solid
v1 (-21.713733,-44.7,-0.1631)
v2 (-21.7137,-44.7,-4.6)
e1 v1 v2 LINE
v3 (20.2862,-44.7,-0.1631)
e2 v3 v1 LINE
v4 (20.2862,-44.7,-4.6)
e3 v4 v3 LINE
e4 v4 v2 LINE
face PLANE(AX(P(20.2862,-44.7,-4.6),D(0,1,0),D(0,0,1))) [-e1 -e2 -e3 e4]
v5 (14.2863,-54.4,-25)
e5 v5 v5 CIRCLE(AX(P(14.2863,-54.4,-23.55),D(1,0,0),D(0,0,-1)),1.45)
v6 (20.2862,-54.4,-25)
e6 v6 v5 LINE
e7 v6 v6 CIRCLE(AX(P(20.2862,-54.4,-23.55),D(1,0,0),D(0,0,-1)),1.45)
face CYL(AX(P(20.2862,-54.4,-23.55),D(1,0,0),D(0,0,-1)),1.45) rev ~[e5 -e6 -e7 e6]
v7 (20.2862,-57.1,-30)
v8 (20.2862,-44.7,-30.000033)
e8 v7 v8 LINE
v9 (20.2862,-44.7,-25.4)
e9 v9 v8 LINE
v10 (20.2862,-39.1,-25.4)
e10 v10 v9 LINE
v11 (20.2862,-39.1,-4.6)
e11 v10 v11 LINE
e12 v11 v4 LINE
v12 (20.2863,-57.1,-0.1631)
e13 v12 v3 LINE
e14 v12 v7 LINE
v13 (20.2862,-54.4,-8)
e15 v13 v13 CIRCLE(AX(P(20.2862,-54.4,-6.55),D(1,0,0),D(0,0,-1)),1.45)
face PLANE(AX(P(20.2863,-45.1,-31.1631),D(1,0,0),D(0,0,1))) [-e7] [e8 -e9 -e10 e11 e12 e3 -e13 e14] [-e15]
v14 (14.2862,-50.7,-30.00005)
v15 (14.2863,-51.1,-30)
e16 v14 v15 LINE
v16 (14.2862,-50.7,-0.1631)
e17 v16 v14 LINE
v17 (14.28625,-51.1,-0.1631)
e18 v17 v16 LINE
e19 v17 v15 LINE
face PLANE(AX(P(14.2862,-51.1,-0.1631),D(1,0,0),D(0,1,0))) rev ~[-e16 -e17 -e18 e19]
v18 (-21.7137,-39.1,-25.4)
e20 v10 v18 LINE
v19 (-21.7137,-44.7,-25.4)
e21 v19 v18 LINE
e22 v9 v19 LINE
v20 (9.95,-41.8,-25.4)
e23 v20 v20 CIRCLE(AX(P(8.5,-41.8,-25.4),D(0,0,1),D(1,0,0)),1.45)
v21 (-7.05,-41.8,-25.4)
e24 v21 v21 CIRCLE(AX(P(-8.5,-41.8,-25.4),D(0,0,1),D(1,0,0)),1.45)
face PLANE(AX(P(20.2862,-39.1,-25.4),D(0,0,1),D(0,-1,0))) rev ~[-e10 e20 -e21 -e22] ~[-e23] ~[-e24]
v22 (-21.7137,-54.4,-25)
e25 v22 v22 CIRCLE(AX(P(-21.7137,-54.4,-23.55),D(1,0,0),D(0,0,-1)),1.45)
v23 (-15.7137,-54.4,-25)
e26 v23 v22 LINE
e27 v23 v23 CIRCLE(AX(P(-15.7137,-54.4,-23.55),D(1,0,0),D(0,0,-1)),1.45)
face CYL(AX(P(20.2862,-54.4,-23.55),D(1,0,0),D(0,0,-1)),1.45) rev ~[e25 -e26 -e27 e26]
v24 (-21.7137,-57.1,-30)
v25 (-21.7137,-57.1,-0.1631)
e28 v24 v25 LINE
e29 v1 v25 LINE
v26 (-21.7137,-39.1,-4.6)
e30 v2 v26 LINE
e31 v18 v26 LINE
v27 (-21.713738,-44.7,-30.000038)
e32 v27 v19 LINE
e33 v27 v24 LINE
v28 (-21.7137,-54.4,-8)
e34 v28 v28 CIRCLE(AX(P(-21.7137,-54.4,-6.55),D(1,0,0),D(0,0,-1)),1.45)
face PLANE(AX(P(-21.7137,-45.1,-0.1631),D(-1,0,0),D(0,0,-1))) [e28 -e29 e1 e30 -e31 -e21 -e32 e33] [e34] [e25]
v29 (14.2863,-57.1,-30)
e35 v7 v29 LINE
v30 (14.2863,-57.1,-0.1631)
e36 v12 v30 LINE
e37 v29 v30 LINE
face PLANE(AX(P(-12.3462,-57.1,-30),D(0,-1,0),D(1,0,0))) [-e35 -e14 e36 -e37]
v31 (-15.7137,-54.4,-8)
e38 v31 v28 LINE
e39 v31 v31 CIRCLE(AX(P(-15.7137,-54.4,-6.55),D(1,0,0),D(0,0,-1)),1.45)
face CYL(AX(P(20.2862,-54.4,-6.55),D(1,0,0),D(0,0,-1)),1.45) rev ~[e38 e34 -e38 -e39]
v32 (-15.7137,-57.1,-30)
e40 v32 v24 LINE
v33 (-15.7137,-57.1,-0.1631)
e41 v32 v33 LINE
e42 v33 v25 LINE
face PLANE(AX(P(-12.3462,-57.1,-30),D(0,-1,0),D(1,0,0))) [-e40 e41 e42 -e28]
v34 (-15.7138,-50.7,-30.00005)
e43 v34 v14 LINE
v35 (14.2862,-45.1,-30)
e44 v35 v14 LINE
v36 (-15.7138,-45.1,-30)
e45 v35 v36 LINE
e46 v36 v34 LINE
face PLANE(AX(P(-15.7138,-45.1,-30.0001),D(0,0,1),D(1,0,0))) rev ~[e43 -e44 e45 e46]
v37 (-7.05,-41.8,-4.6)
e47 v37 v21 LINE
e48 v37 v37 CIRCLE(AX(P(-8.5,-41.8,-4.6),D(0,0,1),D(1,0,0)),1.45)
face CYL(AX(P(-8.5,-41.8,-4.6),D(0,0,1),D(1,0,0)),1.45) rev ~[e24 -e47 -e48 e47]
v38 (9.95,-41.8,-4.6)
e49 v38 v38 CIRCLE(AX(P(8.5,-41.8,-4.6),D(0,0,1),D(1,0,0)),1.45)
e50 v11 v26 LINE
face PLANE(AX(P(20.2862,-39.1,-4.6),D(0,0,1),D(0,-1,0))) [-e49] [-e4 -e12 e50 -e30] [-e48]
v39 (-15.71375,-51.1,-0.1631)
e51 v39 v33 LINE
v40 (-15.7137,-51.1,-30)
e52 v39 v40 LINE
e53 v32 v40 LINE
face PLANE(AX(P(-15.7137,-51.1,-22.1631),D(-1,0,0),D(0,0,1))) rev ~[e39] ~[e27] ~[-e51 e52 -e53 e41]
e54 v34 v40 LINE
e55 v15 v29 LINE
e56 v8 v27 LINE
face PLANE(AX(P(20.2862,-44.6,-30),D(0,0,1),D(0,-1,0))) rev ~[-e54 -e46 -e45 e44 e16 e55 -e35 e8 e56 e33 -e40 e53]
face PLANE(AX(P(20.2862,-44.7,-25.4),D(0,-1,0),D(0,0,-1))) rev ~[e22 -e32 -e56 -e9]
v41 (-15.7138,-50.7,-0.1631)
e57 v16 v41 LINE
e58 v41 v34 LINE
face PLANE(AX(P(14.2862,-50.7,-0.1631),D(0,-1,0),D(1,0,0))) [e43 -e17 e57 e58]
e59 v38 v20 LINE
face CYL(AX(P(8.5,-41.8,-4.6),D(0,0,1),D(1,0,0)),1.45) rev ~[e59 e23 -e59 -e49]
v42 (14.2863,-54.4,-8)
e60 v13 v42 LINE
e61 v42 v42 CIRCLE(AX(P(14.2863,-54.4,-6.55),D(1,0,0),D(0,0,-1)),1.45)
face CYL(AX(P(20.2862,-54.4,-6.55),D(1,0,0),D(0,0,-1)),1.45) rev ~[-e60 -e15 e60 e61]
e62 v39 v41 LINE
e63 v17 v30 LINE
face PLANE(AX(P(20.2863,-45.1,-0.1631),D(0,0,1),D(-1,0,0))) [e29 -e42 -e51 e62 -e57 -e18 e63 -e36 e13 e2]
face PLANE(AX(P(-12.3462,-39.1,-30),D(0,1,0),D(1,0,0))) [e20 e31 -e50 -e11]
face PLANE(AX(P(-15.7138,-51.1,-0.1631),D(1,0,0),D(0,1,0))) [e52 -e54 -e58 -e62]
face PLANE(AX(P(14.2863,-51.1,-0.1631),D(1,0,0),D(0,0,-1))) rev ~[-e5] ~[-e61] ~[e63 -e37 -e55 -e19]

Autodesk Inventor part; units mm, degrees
ref_plane "YZ Plane" through (0, 0, 0) normal (1, 0, 0) x (0, 1, 0)
ref_plane "XZ Plane" through (0, 0, 0) normal (0, 1, 0) x (-1, 0, 0)
ref_plane "XY Plane" through (0, 0, 0) normal (0, 0, 1) x (1, 0, 0)
ref_plane "작업 평면1" through (0, 0, 0) normal (0, 0, 1) x (1, 0, 0)
sketch "스케치1" plane through (0, 0, 0) normal (0, 0, 1) x (1, 0, 0)
  line L0 (-12.7, 12) -> (-9.2, 12) projected
  line L1 (-12.7, 12) -> (-17.8, 6) projected
  line L2 (-17.8, 6) -> (-17.8, -32.6) projected
  line L3 (-17.8, -32.6) -> (-12.7, -38.6) projected
  line L4 (-12.7, -38.6) -> (12.7, -38.6) projected
  line L5 (12.7, -38.6) -> (17.8, -32.6) projected
  line L6 (17.8, -32.6) -> (17.8, 6) projected
  line L7 (17.8, 6) -> (12.7, 12) projected
  line L8 (9.2, 12) -> (12.7, 12) projected
  arc A0 (12.2, 9) -> (9.2, 12) centre (9.2, 9) ccw projected
  line L9 (12.2, -30) -> (12.2, 9) projected
  arc A1 (9.2, -33) -> (12.2, -30) centre (9.2, -30) ccw projected
  line L10 (-9.2, -33) -> (9.2, -33) projected
  arc A2 (-12.2, -30) -> (-9.2, -33) centre (-9.2, -30) ccw projected
  line L11 (-12.2, 9) -> (-12.2, -30) projected
  arc A3 (-9.2, 12) -> (-12.2, 9) centre (-9.2, 9) ccw projected
  circle A4 centre (-15, 4.5) radius 1.35 projected
  circle A5 centre (-15, -12.5) radius 1.35 projected
  circle A6 centre (-8.5, -35.8) radius 1.35 projected
  circle A7 centre (15, 4.5) radius 1.35 projected
  circle A8 centre (15, -12.5) radius 1.35 projected
  circle A9 centre (8.5, -35.8) radius 1.35 projected
  circle A10 centre (-15, -29.5) radius 1.35 projected
  circle A11 centre (15, -29.5) radius 1.35 projected
  arc A12 (9.2, -33.1) -> (12.3, -30) centre (9.2, -30) ccw
  line L12 (12.3, -30) -> (12.3, 9)
  arc A13 (12.3, 9) -> (10.2954, 11.9) centre (9.2, 9) ccw
  line L13 (10.2954, 11.9) -> (12.6538, 11.9)
  line L14 (12.6538, 11.9) -> (17.7, 5.9632)
  line L15 (17.7, 5.9632) -> (17.7, -32.5632)
  line L16 (17.7, -32.5632) -> (12.6538, -38.5)
  line L17 (12.6538, -38.5) -> (-12.6538, -38.5)
  line L18 (-12.6538, -38.5) -> (-17.7, -32.5632)
  line L19 (-17.7, -32.5632) -> (-17.7, 5.9632)
  line L20 (-17.7, 5.9632) -> (-12.6538, 11.9)
  line L21 (-12.6538, 11.9) -> (-10.2954, 11.9)
  arc A14 (-10.2954, 11.9) -> (-12.3, 9) centre (-9.2, 9) ccw
  line L22 (-12.3, 9) -> (-12.3, -30)
  arc A15 (-12.3, -30) -> (-9.2, -33.1) centre (-9.2, -30) ccw
  line L23 (-9.2, -33.1) -> (9.2, -33.1)
  circle A16 centre (-8.5, -35.8) radius 1.45
  circle A17 centre (8.5, -35.8) radius 1.45
  line L24 (12.6538, -33.1) -> (-12.3462, -33.1)
  line L25 (-12.3462, -33.1) -> (-12.3462, -39.1)
  line L26 (-12.3462, -39.1) -> (12.6538, -39.1)
  line L27 (12.6538, -39.1) -> (12.6538, -33.1)
  point P0 (0, 0)
  point P1 (9.2, -33.1)
  point P2 (-9.2, -33.1)
  dimension "d0" = 0.1
  dimension "d1" = 0.1
  dimension "d2" = 0.1
  dimension "d3" = 25
  dimension "d4" = 6
extrude "돌출1" add sketch "스케치1" along normal blind 6 contours L25 L17 L27 L4 | L4 L27 L26 L25 | L25 L24 L23 L27 L17
ref_plane "작업 평면2" through (0, 0, -30) normal (0, 0, -1) x (-1, 0, 0)
sketch "스케치2" plane through (0, 0, -30) normal (0, 0, -1) x (-1, 0, 0)
  line L0 (-12.6538, -33.1) -> (12.3462, -33.1) projected
  line L1 (12.3462, -33.1) -> (12.3462, -39.1) projected
  line L2 (12.3462, -39.1) -> (-12.6538, -39.1) projected
  line L3 (-12.6538, -39.1) -> (-12.6538, -33.1) projected
  circle A0 centre (8.5, -35.8) radius 1.45 projected
  circle A1 centre (-8.5, -35.8) radius 1.45 projected
  point P0 (0, 0)
extrude "돌출2" add sketch "스케치2" along normal blind 6
sketch "스케치3" plane through (-12.3462, -39.1, -30) normal (0, -1, 0) x (1, 0, 0)
  line L0 (0, 30) -> (25, 30) projected
  line L1 (25, 30) -> (25, 36) projected
  line L2 (0, 36) -> (25, 36) projected
  line L3 (0, 30) -> (0, 36) projected
  line L4 (25, 0) -> (0, 0) projected
  line L5 (0, 0) -> (0, -6) projected
  line L6 (25, -6) -> (0, -6) projected
  line L7 (25, 0) -> (25, -6) projected
  line L8 (25, 36) -> (0, 36)
  line L9 (0, 36) -> (0, -6)
  line L10 (0, -6) -> (25, -6)
  line L11 (25, -6) -> (25, 36)
  point P0 (12.3462, 30)
extrude "돌출3" add sketch "스케치3" along normal blind 6
sketch "스케치5" plane through (-12.3462, -45.1, -30) normal (0, -1, 0) x (1, 0, 0)
  circle A0 centre (11.5825, 20.4065) radius 1.6 projected
  line L0 (26.6325, 7.8369) -> (26.6325, 32.8369) projected
  line L1 (-3.3675, 32.8369) -> (26.6325, 32.8369) projected
  line L2 (-3.3675, 32.8369) -> (-3.3675, 7.8369) projected
  line L3 (26.6325, 7.8369) -> (-3.3675, 7.8369) projected
  line L4 (-3.3675, 7.8369) -> (-3.3675, 32.8369) projected
  line L5 (-3.3675, 32.8369) -> (-9.3675, 32.8369) projected
  line L6 (-9.3675, 7.8369) -> (-9.3675, 32.8369) projected
  line L7 (-3.3675, 7.8369) -> (-9.3675, 7.8369) projected
  line L8 (26.6325, 32.8369) -> (26.6325, 7.8369) projected
  line L9 (26.6325, 7.8369) -> (32.6325, 7.8369) projected
  line L10 (32.6325, 32.8369) -> (32.6325, 7.8369) projected
  line L11 (26.6325, 32.8369) -> (32.6325, 32.8369) projected
  line L12 (32.6325, 7.8369) -> (-9.3675, 7.8369)
  line L13 (-9.3675, 7.8369) -> (-9.3675, 1.8369)
  line L14 (-9.3675, 1.8369) -> (32.6325, 1.8369)
  line L15 (32.6325, 1.8369) -> (32.6325, 7.8369)
  line L16 (26.6325, 7.8369) -> (26.6325, 1.8369)
  line L17 (-3.3675, 7.8369) -> (-3.3675, 1.8369)
  line L18 (32.6325, 1.8369) -> (-9.3675, 1.8369)
  line L19 (-9.3675, 1.8369) -> (-9.3675, -1.1631)
  line L20 (-9.3675, -1.1631) -> (32.6325, -1.1631)
  line L21 (32.6325, -1.1631) -> (32.6325, 1.8369)
  line L22 (-9.3675, 32.8369) -> (32.6325, 32.8369)
  line L23 (32.6325, 32.8369) -> (32.6325, 29.8369)
  line L24 (32.6325, 29.8369) -> (-9.3675, 29.8369)
  line L25 (-9.3675, 29.8369) -> (-9.3675, 32.8369)
  point P0 (12.3462, 30)
  point P1 (-9.3675, 29.8369)
  dimension "d18" = 6
  dimension "d24" = 3
  dimension "d25" = 3
extrude "돌출5" add sketch "스케치5" along normal blind 6 contours A0 | L3 L2 L24 L0 | L16 L14 L17 L3 | L0 L24 L10 L9 | L9 L15 L14 L16 | L7 L6 L24 L2 | L17 L14 L13 L7 | L14 L21 L20 L19
sketch "스케치6" plane through (-12.3462, -51.1, -30) normal (0, -1, 0) x (1, 0, 0)
  line L0 (-3.3675, 7.8369) -> (-3.3675, 32.8369) projected
  line L1 (-3.3675, 32.8369) -> (-9.3675, 32.8369) projected
  line L2 (-9.3675, 7.8369) -> (-9.3675, 32.8369) projected
  line L3 (-3.3675, 7.8369) -> (-9.3675, 7.8369) projected
  line L4 (26.6325, 32.8369) -> (26.6325, 7.8369) construction
  line L5 (26.6325, 7.8369) -> (32.6325, 7.8369) construction
  line L6 (32.6325, 32.8369) -> (32.6325, 7.8369) construction
  line L7 (26.6325, 32.8369) -> (32.6325, 32.8369) construction
  line L8 (26.6325, 32.8369) -> (26.6325, 7.8369) projected
  line L9 (26.6325, 7.8369) -> (32.6325, 7.8369) projected
  line L10 (32.6325, 32.8369) -> (32.6325, 7.8369) projected
  line L11 (26.6325, 32.8369) -> (32.6325, 32.8369) projected
  line L12 (32.6325, -1.1631) -> (32.6325, 29.8369) projected
  line L13 (32.6325, 29.8369) -> (-9.3675, 29.8369) projected
  line L14 (-9.3675, 29.8369) -> (-9.3675, -1.1631) projected
  line L15 (-9.3675, -1.1631) -> (32.6325, -1.1631) projected
  line L16 (-9.3675, 29.8369) -> (-9.3675, -1.1631) projected
  line L17 (-3.3675, 7.8369) -> (-9.3675, 7.8369)
  line L18 (-9.3675, 7.8369) -> (-9.3675, -1.1631)
  line L19 (-9.3675, -1.1631) -> (-3.3675, -1.1631)
  line L20 (-3.3675, -1.1631) -> (-3.3675, 7.8369)
  line L21 (26.6325, 7.8369) -> (32.6325, 7.8369)
  line L22 (32.6325, 7.8369) -> (32.6325, -1.1631)
  line L23 (32.6325, -1.1631) -> (26.6325, -1.1631)
  line L24 (26.6325, -1.1631) -> (26.6325, 7.8369)
  point P0 (-3.3675, 29.8369)
  point P1 (26.6325, 29.8369)
  point P2 (-3.3675, -1.1631)
extrude "돌출6" add sketch "스케치6" along normal blind 6 contours L3 L2 L13 L0 | L20 L15 L14 L3 | L13 L10 L9 L8 | L24 L9 L12 L15
sketch "스케치8" plane through (20.2862, -45.1, -0.1631) normal (1, 0, 0) x (0, 0, -1)
  line L0 (27.5869, -57.1) -> (24.0869, -57.1) projected
  line L1 (27.5869, -57.1) -> (32.6869, -51.1) projected
  line L2 (32.6869, -51.1) -> (32.6869, -12.5) projected
  line L3 (32.6869, -12.5) -> (27.5869, -6.5) projected
  line L4 (27.5869, -6.5) -> (2.1869, -6.5) projected
  line L5 (2.1869, -6.5) -> (-2.9131, -12.5) projected
  line L6 (-2.9131, -12.5) -> (-2.9131, -51.1) projected
  line L7 (-2.9131, -51.1) -> (2.1869, -57.1) projected
  line L8 (5.6869, -57.1) -> (2.1869, -57.1) projected
  arc A0 (2.6869, -54.1) -> (5.6869, -57.1) centre (5.6869, -54.1) ccw projected
  line L9 (2.6869, -15.1) -> (2.6869, -54.1) projected
  arc A1 (5.6869, -12.1) -> (2.6869, -15.1) centre (5.6869, -15.1) ccw projected
  line L10 (24.0869, -12.1) -> (5.6869, -12.1) projected
  arc A2 (27.0869, -15.1) -> (24.0869, -12.1) centre (24.0869, -15.1) ccw projected
  line L11 (27.0869, -54.1) -> (27.0869, -15.1) projected
  arc A3 (24.0869, -57.1) -> (27.0869, -54.1) centre (24.0869, -54.1) ccw projected
  circle A4 centre (29.8869, -49.6) radius 1.35 projected
  circle A5 centre (29.8869, -32.6) radius 1.35 projected
  circle A6 centre (23.3869, -9.3) radius 1.35 projected
  circle A7 centre (-0.1131, -49.6) radius 1.35 projected
  circle A8 centre (-0.1131, -32.6) radius 1.35 projected
  circle A9 centre (6.3869, -9.3) radius 1.35 projected
  circle A10 centre (29.8869, -15.6) radius 1.35 projected
  circle A11 centre (-0.1131, -15.6) radius 1.35 projected
  circle A12 centre (6.3869, -9.3) radius 1.35 projected
  circle A13 centre (6.3869, -9.3) radius 1.45
  circle A14 centre (23.3869, -9.3) radius 1.45
  point P0 (-0.1631, 45.1)
  dimension "d26" = 0.1
  dimension "d27" = 0.1
extrude "돌출8" cut sketch "스케치8" against normal blind 50 contours A6 | A9 | A13 | A14
sketch "스케치9" plane through (-12.3462, -45.1, -30) normal (0, 1, 0) x (1, 0, 0)
  line L0 (25, 1.1631) -> (25, -29.8369) projected
  line L1 (32.6325, -29.8369) -> (25, -29.8369) projected
  line L2 (32.6325, 1.1631) -> (32.6325, -29.8369) projected
  line L3 (25, 1.1631) -> (32.6325, 1.1631) projected
  line L4 (0, -29.8369) -> (0, 1.1631) projected
  line L5 (-9.3675, 1.1631) -> (0, 1.1631) projected
  line L6 (-9.3675, -29.8369) -> (-9.3675, 1.1631) projected
  line L7 (0, -29.8369) -> (-9.3675, -29.8369) projected
  point P0 (12.3462, -30)
extrude "돌출9" add sketch "스케치9" along normal blind 6
sketch "스케치10" plane through (-21.7138, -45.1, -0.1631) normal (0, 0, 1) x (1, 0, 0)
  line L0 (9.3675, 12) -> (9.3675, 0) projected
  line L1 (9.3675, 12) -> (34.3675, 12) projected
  line L2 (34.3675, 12) -> (34.3675, 0) projected
  line L3 (9.3675, 0) -> (34.3675, 0) projected
  circle A0 centre (30.2138, 9.3) radius 1.45 projected
  circle A1 centre (13.2138, 9.3) radius 1.45 projected
  line L4 (34.3675, 0) -> (9.3675, 0) projected
  line L5 (34.3675, 6) -> (34.3675, 0) projected
  line L6 (42, 6) -> (34.3675, 6) projected
  line L7 (42, -12) -> (42, 6) projected
  line L8 (36, -12) -> (42, -12) projected
  line L9 (36, -6) -> (36, -12) projected
  line L10 (6, -6) -> (36, -6) projected
  line L11 (6, -6) -> (6, -12) projected
  line L12 (0, -12) -> (6, -12) projected
  line L13 (0, 6) -> (0, -12) projected
  line L14 (9.3675, 6) -> (0, 6) projected
  line L15 (9.3675, 0) -> (9.3675, 6) projected
  line L16 (6, -6) -> (6, 4.4236)
  line L17 (36, -6) -> (6, -6) projected
  line L18 (36, -6) -> (36, 5.3756)
  line L19 (36, -6) -> (6, -6)
  line L20 (6, -6) -> (6, 0)
  line L21 (6, 0) -> (36, 0)
  line L22 (36, 0) -> (36, -6)
  point P0 (21.7138, 45.1)
  point P1 (36, 0)
extrude "돌출10" cut sketch "스케치10" against normal blind 50 contours L3 L21 L18 L10 L16
sketch "스케치11" plane through (12.6538, -33.1, -30) normal (1, 0, 0) x (0, 0, -1)
  line L0 (0, -6) -> (1.1631, -6) projected
  line L1 (1.1631, -6) -> (1.1631, -12) projected
  line L2 (6, -12) -> (1.1631, -12) projected
  line L3 (6, 0) -> (6, -12) projected
  line L4 (0, 0) -> (6, 0) projected
  line L5 (0, 0) -> (0, -6) projected
  line L6 (-29.8369, -12) -> (-29.8369, -6) projected
  line L7 (-29.8369, -6) -> (-30, -6) projected
  line L8 (-30, -6) -> (-30, 0) projected
  line L9 (-30, 0) -> (-36, 0) projected
  line L10 (-36, 0) -> (-36, -12) projected
  line L11 (-29.8369, -12) -> (-36, -12) projected
  line L12 (-29.8369, -12) -> (-29.8369, -6) projected
  line L13 (-29.8369, -6) -> (-30, -6) projected
  line L14 (-30, -6) -> (-30, 0) projected
  line L15 (-30, 0) -> (-36, 0) projected
  line L16 (-36, 0) -> (-36, -12) projected
  line L17 (-29.8369, -12) -> (-36, -12) projected
  line L18 (0, -6) -> (1.1631, -6) projected
  line L19 (1.1631, -6) -> (1.1631, -12) projected
  line L20 (6, -12) -> (1.1631, -12) projected
  line L21 (6, 0) -> (6, -12) projected
  line L22 (0, 0) -> (6, 0) projected
  line L23 (0, 0) -> (0, -6) projected
  point P0 (-30, 33.1)
extrude "돌출11" cut sketch "스케치11" against normal blind 50
sketch "스케치12" plane through (20.2862, -39.1, -0.1631) normal (1, 0, 0) x (0, 0, -1)
  line L0 (29.8369, -5.5) -> (29.8369, 0.5) projected
  line L1 (4.3369, -5.5) -> (4.3369, -0.375) projected
  line L2 (29.8369, 0.5) -> (29.8369, -18)
  line L3 (0, -18) -> (31, -18) projected
  circle A0 centre (6.3869, -15.3) radius 1.45 projected
  circle A1 centre (23.3869, -15.3) radius 1.45 projected
  line L4 (0, 0) -> (0, -18) projected
  line L5 (31, -18) -> (0, -18) projected
  line L6 (31, -18) -> (31, 0) projected
  line L7 (0, 0) -> (31, 0) projected
  point P0 (-0.1631, 39.1)
  point P1 (29.8369, 0)
extrude "돌출12" cut sketch "스케치12" against normal blind 50 contours L0 L7 L6 L3 L2
sketch "스케치13" plane through (20.2862, -57.1, -0.1631) normal (1, 0, 0) x (0, 0, -1)
  line L0 (29.8369, 12.5) -> (29.8369, 18.5) projected
  line L1 (29.8369, 0) -> (29.8369, 18) projected
  line L2 (4.3369, 12.5) -> (4.3369, 17.625) projected
  line L3 (-0.1631, 12.5) -> (-0.1631, 18.5) projected
  line L4 (0, 18) -> (0, 0) projected
  line L5 (4.3369, 12.5) -> (4.3369, 17.625) projected
  line L6 (4.3369, 12.5) -> (4.3369, 17.625) projected
  line L7 (4.3369, 12.5) -> (4.3369, 17.625) projected
  line L8 (4.3369, 18.1) -> (25.3369, 18.1) projected
  line L9 (4.4369, 18.5) -> (4.4369, 23.625)
  line L10 (4.3369, 18) -> (25.3369, 18)
  line L11 (25.3369, 12.5) -> (25.3369, 17.625) projected
  line L12 (25.2369, 18.5) -> (25.2369, 23.625)
  line L13 (4.4369, 18.5) -> (4.4369, 18)
  line L14 (29.8369, 18) -> (0, 18) projected
  line L15 (4.4369, 18) -> (4.4369, 12.4)
  line L16 (4.4369, 12.4) -> (0, 12.4)
  line L17 (25.2369, 18.5) -> (25.2369, 18)
  line L18 (25.2369, 18) -> (25.2369, 12.4)
  line L19 (25.2369, 12.4) -> (29.8369, 12.4)
  point P0 (-0.1631, 57.1)
  dimension "d38" = 0.1
  dimension "d39" = 0.1
  dimension "d40" = 0.1
  dimension "d41" = 5.6
  dimension "d42" = 5.6
extrude "돌출13" cut sketch "스케치13" against normal blind 50 contours L1 L19 L18 L10 L14 L0 | L15 L16 L4 L14 L10
sketch "스케치14" plane through (20.2862, -44.7, -4.6) normal (0, 0, 1) x (1, 0, 0)
  line L0 (-32.9862, 50.7) -> (-29.4862, 50.7) projected
  line L1 (-32.9862, 50.7) -> (-38.0862, 44.7) projected
  line L2 (-38.0862, 44.7) -> (-38.0862, 6.1) projected
  line L3 (-38.0862, 6.1) -> (-32.9862, 0.1) projected
  line L4 (-32.9862, 0.1) -> (-7.5862, 0.1) projected
  line L5 (-7.5862, 0.1) -> (-2.4862, 6.1) projected
  line L6 (-2.4862, 6.1) -> (-2.4862, 44.7) projected
  line L7 (-2.4862, 44.7) -> (-7.5862, 50.7) projected
  line L8 (-11.0862, 50.7) -> (-7.5862, 50.7) projected
  arc A0 (-8.0862, 47.7) -> (-11.0862, 50.7) centre (-11.0862, 47.7) ccw projected
  line L9 (-8.0862, 8.7) -> (-8.0862, 47.7) projected
  arc A1 (-11.0862, 5.7) -> (-8.0862, 8.7) centre (-11.0862, 8.7) ccw projected
  line L10 (-29.4862, 5.7) -> (-11.0862, 5.7) projected
  arc A2 (-32.4862, 8.7) -> (-29.4862, 5.7) centre (-29.4862, 8.7) ccw projected
  line L11 (-32.4862, 47.7) -> (-32.4862, 8.7) projected
  arc A3 (-29.4862, 50.7) -> (-32.4862, 47.7) centre (-29.4862, 47.7) ccw projected
  circle A4 centre (-35.2862, 43.2) radius 1.35 projected
  circle A5 centre (-35.2862, 26.2) radius 1.35 projected
  circle A6 centre (-28.7862, 2.9) radius 1.35 projected
  circle A7 centre (-5.2862, 43.2) radius 1.35 projected
  circle A8 centre (-5.2862, 26.2) radius 1.35 projected
  circle A9 centre (-11.7862, 2.9) radius 1.35 projected
  circle A10 centre (-35.2862, 9.2) radius 1.35 projected
  circle A11 centre (-5.2862, 9.2) radius 1.35 projected
  circle A12 centre (-11.7862, 2.9) radius 1.45
  circle A13 centre (-28.7862, 2.9) radius 1.45
  dimension "d48" = 0.1
  dimension "d49" = 0.1
sketch "스케치15" plane through (-15.7138, -45.1, -0.1631) normal (0, 0, 1) x (1, 0, 0)
  line L0 (36, 0.4) -> (-6, 0.4) projected
  line L1 (-6, 0.4) -> (-6, -12) projected
  line L2 (0, -12) -> (-6, -12) projected
  line L3 (0, -12) -> (0, 0) projected
  line L4 (30, 0) -> (0, 0) projected
  line L5 (30, 0) -> (30, -12) projected
  line L6 (36, -12) -> (30, -12) projected
  line L7 (36, 0.4) -> (36, -12) projected
  line L8 (-6, 0.4) -> (-6, -12) projected
  line L9 (36, 0.4) -> (-6, 0.4)
  line L10 (-6, 0.4) -> (-6, -5.6)
  line L11 (-6, -5.6) -> (36, -5.6)
  line L12 (36, -5.6) -> (36, 0.4)
  point P0 (15.7138, 45.1)
  point P1 (36, -5.6)
  point P2 (-6, -5.6)
  dimension "d45" = 6
extrude "돌출14" add sketch "스케치15" against normal blind 29.837 contours L7 L11 L5 L4 L3 L1 L0 | L11 L3 L4 L5
extrude "돌출15" cut sketch "스케치14" against normal blind 29.837 contours A6 | A9 | A12 | A13
properties part number "39" material "LCP 플라스틱"
